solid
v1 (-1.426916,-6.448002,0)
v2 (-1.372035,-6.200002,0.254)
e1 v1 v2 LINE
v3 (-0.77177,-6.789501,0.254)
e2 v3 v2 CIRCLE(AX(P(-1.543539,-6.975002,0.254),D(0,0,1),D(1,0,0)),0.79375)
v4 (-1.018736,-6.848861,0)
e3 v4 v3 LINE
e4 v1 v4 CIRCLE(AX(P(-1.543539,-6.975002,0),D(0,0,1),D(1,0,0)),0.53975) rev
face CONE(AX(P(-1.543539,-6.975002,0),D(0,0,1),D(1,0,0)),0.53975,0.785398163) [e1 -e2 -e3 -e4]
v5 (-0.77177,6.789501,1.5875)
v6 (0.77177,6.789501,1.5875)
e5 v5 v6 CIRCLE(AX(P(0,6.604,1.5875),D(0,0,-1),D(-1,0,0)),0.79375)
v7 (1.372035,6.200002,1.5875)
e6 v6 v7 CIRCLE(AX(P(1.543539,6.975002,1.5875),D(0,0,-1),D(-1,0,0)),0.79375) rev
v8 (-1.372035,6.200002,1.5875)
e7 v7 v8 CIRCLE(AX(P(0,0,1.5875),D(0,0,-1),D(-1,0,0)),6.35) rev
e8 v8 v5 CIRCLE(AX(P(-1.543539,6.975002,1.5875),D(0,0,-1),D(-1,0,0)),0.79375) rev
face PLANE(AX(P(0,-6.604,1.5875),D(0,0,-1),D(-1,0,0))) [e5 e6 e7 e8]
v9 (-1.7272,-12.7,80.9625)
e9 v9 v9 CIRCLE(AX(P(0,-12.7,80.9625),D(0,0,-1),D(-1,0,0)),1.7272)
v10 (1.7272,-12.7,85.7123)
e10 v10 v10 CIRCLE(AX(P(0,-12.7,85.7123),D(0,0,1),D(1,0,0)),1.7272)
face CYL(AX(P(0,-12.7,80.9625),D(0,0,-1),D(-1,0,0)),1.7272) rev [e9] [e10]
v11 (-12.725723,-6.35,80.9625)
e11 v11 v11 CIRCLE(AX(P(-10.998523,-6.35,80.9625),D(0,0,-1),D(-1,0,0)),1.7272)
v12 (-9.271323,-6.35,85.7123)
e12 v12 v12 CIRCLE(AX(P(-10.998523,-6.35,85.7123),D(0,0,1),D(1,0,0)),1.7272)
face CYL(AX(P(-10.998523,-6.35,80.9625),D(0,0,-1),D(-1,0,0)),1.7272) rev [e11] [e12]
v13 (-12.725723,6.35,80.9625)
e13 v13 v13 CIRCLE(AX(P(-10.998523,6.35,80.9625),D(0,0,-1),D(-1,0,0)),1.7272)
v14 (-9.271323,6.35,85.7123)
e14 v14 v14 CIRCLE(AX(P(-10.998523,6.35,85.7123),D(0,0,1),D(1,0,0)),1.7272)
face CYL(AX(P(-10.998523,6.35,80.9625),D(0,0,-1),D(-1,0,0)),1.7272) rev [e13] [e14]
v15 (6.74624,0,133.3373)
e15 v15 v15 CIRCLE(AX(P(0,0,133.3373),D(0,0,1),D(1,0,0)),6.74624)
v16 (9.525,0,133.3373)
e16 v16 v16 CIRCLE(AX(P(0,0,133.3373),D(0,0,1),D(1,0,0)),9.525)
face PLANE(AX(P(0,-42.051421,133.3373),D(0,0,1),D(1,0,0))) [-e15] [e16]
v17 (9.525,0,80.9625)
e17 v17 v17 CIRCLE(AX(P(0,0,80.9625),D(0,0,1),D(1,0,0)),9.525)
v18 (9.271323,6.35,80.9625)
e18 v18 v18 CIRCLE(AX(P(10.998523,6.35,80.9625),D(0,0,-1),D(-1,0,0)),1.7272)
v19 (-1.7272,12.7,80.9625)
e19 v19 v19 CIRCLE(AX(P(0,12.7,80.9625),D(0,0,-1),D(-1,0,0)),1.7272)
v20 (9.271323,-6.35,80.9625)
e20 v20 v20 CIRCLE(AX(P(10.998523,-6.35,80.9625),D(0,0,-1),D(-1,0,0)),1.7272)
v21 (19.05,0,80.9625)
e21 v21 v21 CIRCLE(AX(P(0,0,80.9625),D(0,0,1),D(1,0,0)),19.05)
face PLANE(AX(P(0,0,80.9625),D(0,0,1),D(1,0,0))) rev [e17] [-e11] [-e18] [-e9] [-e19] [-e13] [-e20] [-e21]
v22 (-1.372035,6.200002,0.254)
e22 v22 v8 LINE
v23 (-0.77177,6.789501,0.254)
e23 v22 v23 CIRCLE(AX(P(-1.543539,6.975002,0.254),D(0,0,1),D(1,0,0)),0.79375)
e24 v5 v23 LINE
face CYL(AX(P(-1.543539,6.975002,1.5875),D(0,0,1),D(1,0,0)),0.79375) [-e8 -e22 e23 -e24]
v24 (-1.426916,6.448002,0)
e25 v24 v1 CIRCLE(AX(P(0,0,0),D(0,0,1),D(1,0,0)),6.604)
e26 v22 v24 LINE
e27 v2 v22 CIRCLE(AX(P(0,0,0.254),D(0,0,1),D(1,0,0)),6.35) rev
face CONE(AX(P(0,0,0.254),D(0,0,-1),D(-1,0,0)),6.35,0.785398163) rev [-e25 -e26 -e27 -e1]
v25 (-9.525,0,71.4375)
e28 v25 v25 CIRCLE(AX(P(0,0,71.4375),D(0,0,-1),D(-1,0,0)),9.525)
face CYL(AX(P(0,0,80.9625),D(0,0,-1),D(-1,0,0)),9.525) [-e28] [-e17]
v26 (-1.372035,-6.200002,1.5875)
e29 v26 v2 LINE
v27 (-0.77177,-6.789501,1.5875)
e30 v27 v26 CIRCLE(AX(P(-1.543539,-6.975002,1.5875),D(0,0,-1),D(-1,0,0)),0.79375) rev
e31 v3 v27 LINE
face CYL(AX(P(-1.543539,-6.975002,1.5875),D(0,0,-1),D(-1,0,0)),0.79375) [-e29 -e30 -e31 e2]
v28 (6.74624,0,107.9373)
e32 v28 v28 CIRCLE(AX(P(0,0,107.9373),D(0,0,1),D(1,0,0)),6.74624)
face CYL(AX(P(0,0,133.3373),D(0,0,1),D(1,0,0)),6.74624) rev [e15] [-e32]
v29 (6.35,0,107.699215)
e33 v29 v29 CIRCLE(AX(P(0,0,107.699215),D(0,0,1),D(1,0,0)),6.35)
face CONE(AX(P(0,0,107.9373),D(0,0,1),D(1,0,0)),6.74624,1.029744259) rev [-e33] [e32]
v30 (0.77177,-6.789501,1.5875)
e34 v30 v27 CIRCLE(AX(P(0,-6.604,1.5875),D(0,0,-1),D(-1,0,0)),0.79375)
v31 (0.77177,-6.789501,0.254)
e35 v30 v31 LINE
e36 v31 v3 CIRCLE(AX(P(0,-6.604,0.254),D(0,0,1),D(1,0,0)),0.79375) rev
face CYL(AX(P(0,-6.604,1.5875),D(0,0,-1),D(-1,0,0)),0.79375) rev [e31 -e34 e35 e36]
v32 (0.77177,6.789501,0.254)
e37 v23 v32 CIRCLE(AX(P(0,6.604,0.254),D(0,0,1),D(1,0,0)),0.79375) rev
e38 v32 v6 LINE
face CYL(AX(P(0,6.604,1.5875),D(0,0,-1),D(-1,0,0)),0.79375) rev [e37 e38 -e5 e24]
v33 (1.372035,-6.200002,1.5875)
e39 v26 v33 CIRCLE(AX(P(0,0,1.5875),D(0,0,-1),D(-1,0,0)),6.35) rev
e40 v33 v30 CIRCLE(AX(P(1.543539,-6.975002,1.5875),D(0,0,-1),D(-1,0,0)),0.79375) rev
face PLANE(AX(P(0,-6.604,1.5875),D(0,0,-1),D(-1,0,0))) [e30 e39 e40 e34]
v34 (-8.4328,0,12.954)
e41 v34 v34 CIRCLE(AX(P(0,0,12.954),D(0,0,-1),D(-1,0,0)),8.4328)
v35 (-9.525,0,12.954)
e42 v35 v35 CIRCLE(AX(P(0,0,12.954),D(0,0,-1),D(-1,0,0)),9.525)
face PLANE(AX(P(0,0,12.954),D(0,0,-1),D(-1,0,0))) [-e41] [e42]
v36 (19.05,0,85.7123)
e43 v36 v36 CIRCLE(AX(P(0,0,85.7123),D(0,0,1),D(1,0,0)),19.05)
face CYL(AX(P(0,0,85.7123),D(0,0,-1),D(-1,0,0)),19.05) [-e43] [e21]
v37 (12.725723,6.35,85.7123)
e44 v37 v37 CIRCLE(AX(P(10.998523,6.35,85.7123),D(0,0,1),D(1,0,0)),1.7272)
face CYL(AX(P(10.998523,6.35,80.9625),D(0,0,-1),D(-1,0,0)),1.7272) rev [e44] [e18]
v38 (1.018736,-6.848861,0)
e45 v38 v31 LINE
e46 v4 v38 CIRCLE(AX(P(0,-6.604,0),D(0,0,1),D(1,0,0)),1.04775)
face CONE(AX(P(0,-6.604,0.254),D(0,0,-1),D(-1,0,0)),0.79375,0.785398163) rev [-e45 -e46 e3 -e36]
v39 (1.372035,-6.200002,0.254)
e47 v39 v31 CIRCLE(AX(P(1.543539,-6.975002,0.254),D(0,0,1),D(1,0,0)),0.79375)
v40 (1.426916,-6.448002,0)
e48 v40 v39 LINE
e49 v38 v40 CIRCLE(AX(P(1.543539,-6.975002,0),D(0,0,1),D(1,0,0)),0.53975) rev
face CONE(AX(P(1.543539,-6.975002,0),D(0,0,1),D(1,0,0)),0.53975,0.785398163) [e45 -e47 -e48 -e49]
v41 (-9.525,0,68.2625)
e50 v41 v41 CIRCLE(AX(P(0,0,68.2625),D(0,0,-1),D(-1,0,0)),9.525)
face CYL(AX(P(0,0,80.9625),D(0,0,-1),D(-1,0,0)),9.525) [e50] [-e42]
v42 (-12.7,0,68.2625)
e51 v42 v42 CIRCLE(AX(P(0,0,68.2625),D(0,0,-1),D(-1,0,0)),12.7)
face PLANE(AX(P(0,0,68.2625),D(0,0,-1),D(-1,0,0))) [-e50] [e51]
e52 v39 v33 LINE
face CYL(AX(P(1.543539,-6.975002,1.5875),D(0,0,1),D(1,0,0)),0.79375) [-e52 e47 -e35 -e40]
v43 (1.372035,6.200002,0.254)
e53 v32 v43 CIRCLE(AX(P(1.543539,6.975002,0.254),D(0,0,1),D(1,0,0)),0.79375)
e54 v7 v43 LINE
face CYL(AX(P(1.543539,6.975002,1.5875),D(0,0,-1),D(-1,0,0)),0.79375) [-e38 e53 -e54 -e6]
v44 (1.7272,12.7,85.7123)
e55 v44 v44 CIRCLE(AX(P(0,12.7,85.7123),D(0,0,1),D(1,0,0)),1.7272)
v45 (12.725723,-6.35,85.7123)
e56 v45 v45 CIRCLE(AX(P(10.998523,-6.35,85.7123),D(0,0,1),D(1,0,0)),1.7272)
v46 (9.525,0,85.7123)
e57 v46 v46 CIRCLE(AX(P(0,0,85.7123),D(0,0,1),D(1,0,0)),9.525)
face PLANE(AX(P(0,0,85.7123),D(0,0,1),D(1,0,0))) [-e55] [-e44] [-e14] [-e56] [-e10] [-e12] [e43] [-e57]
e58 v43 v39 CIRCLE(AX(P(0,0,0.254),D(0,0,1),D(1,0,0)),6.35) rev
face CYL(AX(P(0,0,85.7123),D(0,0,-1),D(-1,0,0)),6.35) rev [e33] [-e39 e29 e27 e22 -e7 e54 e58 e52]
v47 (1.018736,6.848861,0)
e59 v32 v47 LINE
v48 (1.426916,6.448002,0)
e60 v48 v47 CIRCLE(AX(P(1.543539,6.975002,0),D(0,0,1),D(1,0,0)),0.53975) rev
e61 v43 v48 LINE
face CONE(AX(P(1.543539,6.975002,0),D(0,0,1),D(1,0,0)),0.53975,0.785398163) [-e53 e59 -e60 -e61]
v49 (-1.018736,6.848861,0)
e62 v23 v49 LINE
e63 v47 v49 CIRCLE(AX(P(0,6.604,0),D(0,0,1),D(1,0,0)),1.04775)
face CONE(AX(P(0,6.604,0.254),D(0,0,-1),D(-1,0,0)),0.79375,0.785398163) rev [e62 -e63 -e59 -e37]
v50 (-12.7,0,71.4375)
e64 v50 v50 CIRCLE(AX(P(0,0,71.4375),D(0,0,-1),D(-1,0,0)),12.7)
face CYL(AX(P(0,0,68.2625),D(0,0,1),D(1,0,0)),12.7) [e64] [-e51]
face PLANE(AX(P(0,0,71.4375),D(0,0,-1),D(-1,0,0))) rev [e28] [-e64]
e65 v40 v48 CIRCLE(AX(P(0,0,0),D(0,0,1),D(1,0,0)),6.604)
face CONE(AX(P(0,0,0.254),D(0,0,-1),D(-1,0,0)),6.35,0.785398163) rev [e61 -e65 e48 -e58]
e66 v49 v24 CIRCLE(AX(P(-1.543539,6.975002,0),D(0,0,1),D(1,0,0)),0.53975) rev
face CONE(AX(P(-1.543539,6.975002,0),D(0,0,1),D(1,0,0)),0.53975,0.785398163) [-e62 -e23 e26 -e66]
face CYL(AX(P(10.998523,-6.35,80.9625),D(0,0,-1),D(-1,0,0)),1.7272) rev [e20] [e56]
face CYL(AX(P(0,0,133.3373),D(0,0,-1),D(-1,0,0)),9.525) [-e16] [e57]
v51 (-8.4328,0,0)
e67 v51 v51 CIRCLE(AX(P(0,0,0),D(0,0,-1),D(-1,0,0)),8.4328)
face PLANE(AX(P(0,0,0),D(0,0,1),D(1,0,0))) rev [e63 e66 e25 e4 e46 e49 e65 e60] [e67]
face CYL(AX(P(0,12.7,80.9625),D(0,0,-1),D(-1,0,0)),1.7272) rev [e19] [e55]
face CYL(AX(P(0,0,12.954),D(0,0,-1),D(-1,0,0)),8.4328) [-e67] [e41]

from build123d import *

# Parameters (mm, degrees)
SKETCH1_R                      = 9.525
BOSS_EXTRUDE1_DEPTH            = 80.9625
SKETCH2_R                      = 19.05
BOSS_EXTRUDE2_DEPTH            = 4.7498
SKETCH5_OUTSIDE_W              = 60.348
SKETCH5_OUTSIDE_H              = 60.348
SKETCH5_OUTSIDE_R              = 8.4328
CUT_EXTRUDE1_DEPTH             = 12.954
SKETCH7_R                      = 12.7
BOSS_EXTRUDE3_DEPTH            = 3.175
F_8_32_TAPPED_HOLE1_AT_2_COUNT = 2
F_8_32_TAPPED_HOLE1_AT_2_PITCH = 12.7
F_8_32_TAPPED_HOLE1_AT_3_COUNT = 2
F_8_32_TAPPED_HOLE1_AT_3_PITCH = 21.997045256
F_8_32_TAPPED_HOLE1_AT_4_COUNT = 2
F_8_32_TAPPED_HOLE1_AT_4_PITCH = 25.4
F_8_32_TAPPED_HOLE1_AT_5_COUNT = 2
F_8_32_TAPPED_HOLE1_AT_5_PITCH = 21.997045256
F_8_32_TAPPED_HOLE1_AT_6_COUNT = 2
F_8_32_TAPPED_HOLE1_AT_6_PITCH = 12.7
SKETCH6_R                      = 6.35
CUT_EXTRUDE2_DEPTH             = 90.846554588
SKETCH10_R                     = 9.525
SKETCH10_R_2                   = 6.35
BOSS_EXTRUDE4_DEPTH            = 47.625
F_5_8_11_TAPPED_HOLE1_D        = 13.49248
F_5_8_11_TAPPED_HOLE1_DEPTH    = 25.4
F_5_8_11_TAPPED_HOLE1_TIP      = 4.053549943
CUT_EXTRUDE3_DEPTH             = 1.5875
FILLET1_R                      = 0.79375
CHAMFER1_SIZE                  = 0.254


with BuildPart() as part:
    # Sketch1 → Boss-Extrude1 (new body)
    with BuildSketch(Plane.XY):
        Circle(SKETCH1_R)
    extrude(amount=BOSS_EXTRUDE1_DEPTH)

    # Sketch2 → Boss-Extrude2 (add)
    with BuildSketch(Plane.XY.offset(80.9625)):
        Circle(SKETCH2_R)
    extrude(amount=BOSS_EXTRUDE2_DEPTH)

    # Sketch5 outside → Cut-Extrude1 (cut)
    with BuildSketch(Plane(origin=(0, 0, 0), x_dir=(-1, 0, 0), z_dir=(0, 0, -1))):
        Rectangle(SKETCH5_OUTSIDE_W, SKETCH5_OUTSIDE_H)
        Circle(SKETCH5_OUTSIDE_R, mode=Mode.SUBTRACT)
    extrude(amount=-CUT_EXTRUDE1_DEPTH, mode=Mode.SUBTRACT)

    # Sketch7 → Boss-Extrude3 (add)
    with BuildSketch(Plane(origin=(0, 0, 71.4375), x_dir=(-1, 0, 0), z_dir=(0, 0, -1))):
        Circle(SKETCH7_R)
    extrude(amount=BOSS_EXTRUDE3_DEPTH)

    # Sketch8 → #8-32 Tapped Hole1 (revolve, cut)
    with BuildSketch(Plane(origin=(0, 12.7, 80.9625), x_dir=(0, 1, 0), z_dir=(1, 0, 0))):
        Polygon((0, 0), (0, 11.705806461), (1.7272, 10.668), (1.7272, 0), align=None)
    f_8_32_tapped_hole1 = revolve(axis=Axis((0, 12.7, 74.6125), (0, 0, 1)), mode=Mode.SUBTRACT)

    # #8-32 Tapped Hole1 at 2: #8-32 Tapped Hole1 ×2
    with Locations(*[Vector(-0.8660254037844382, -0.500000000000001, 0) * (i * F_8_32_TAPPED_HOLE1_AT_2_PITCH) for i in range(1, F_8_32_TAPPED_HOLE1_AT_2_COUNT)]):
        add(f_8_32_tapped_hole1, mode=Mode.SUBTRACT)

    # #8-32 Tapped Hole1 at 3: #8-32 Tapped Hole1 ×2
    with Locations(*[Vector(-0.5000000000000153, -0.8660254037844298, 0) * (i * F_8_32_TAPPED_HOLE1_AT_3_PITCH) for i in range(1, F_8_32_TAPPED_HOLE1_AT_3_COUNT)]):
        add(f_8_32_tapped_hole1, mode=Mode.SUBTRACT)

    # #8-32 Tapped Hole1 at 4: #8-32 Tapped Hole1 ×2
    with Locations(*[(0, -i * F_8_32_TAPPED_HOLE1_AT_4_PITCH, 0) for i in range(1, F_8_32_TAPPED_HOLE1_AT_4_COUNT)]):
        add(f_8_32_tapped_hole1, mode=Mode.SUBTRACT)

    # #8-32 Tapped Hole1 at 5: #8-32 Tapped Hole1 ×2
    with Locations(*[Vector(0.4999999999999846, -0.8660254037844476, 0) * (i * F_8_32_TAPPED_HOLE1_AT_5_PITCH) for i in range(1, F_8_32_TAPPED_HOLE1_AT_5_COUNT)]):
        add(f_8_32_tapped_hole1, mode=Mode.SUBTRACT)

    # #8-32 Tapped Hole1 at 6: #8-32 Tapped Hole1 ×2
    with Locations(*[Vector(0.86602540378443, -0.5000000000000151, 0) * (i * F_8_32_TAPPED_HOLE1_AT_6_PITCH) for i in range(1, F_8_32_TAPPED_HOLE1_AT_6_COUNT)]):
        add(f_8_32_tapped_hole1, mode=Mode.SUBTRACT)

    # Sketch6 → Cut-Extrude2 (cut, through all)
    with BuildSketch(Plane(origin=(0, 0, 0), x_dir=(-1, 0, 0), z_dir=(0, 0, -1))):
        Circle(SKETCH6_R)
    extrude(amount=-CUT_EXTRUDE2_DEPTH, mode=Mode.SUBTRACT)

    # Sketch10 → Boss-Extrude4 (add)
    with BuildSketch(Plane.XY.offset(85.7123)):
        with Locations(Location((0, 0, 0), (0, 0, 180))):
            Circle(SKETCH10_R)
        with Locations(Location((0, 0, 0), (0, 0, 180))):
            Circle(SKETCH10_R_2, mode=Mode.SUBTRACT)
    extrude(amount=BOSS_EXTRUDE4_DEPTH)

    # 5/8-11 Tapped Hole1
    with Locations(Plane.XY.offset(133.3373)):
        with Locations((0, 0)):
            Hole(F_5_8_11_TAPPED_HOLE1_D / 2, depth=F_5_8_11_TAPPED_HOLE1_DEPTH)
            with Locations((0, 0, -(F_5_8_11_TAPPED_HOLE1_DEPTH + F_5_8_11_TAPPED_HOLE1_TIP / 2))):  # 118° drill point
                Cone(0, F_5_8_11_TAPPED_HOLE1_D / 2, F_5_8_11_TAPPED_HOLE1_TIP, mode=Mode.SUBTRACT)

    # Sketch13 → Cut-Extrude3 (cut)
    with BuildSketch(Plane(origin=(0, 0, 0), x_dir=(-1, 0, 0), z_dir=(0, 0, -1))):
        with BuildLine():
            Line((-0.79375, -6.604), (-0.79375, 6.604))
            ThreePointArc((-0.79375, 6.604), (0, 7.39775), (0.79375, 6.604))
            Line((0.79375, 6.604), (0.79375, -6.604))
            ThreePointArc((0.79375, -6.604), (0, -7.39775), (-0.79375, -6.604))
        make_face()
    extrude(amount=-CUT_EXTRUDE3_DEPTH, mode=Mode.SUBTRACT)

    # Fillet1
    # the kernel refuses this fillet: 0.79375 mm, written as the material it takes off along each edge
    with BuildSketch(Plane(origin=(0.79375, -6.300195309, 1.5875), x_dir=(0.9853201649720871, 0.17071664388506244, 0), z_dir=(0, 0, -1)), Plane(origin=(-0.79375, 6.300195309, 1.5875), x_dir=(-0.9853201649720869, -0.17071664388506383, 0), z_dir=(0, 0, -1))) as fillet1_piece_1:
        with BuildLine():
            CenterArc((0.623581926, 0.792901977), FILLET1_R, 203.344606785, 64.006660147)
            Line((-0.105190236, 0.478370264), (-0.178067452, 0.446917093))
            ThreePointArc((-0.178067452, 0.446917093), (-0.130074305, 0.285794254), (-0.078209788, -0.013550634))
            Line((-0.078209788, -0.013550634), (0.003668129, -0.079290198))
            ThreePointArc((0.003668129, -0.079290198), (0.293450318, -0.072590818), (0.583232507, -0.079290198))
            Line((0.583232507, -0.079290198), (0.586900636, 0))
        make_face()
    extrude(amount=3.054751591, mode=Mode.SUBTRACT)
    with BuildSketch(Plane(origin=(0.79375, 6.300195309, 1.5875), x_dir=(0.985320164972087, -0.17071664388506264, 0), z_dir=(0, 0, -1)), Plane(origin=(-0.79375, -6.300195309, 1.5875), x_dir=(-0.9853201649720869, 0.17071664388506363, 0), z_dir=(0, 0, -1))) as fillet1_piece_2:
        with BuildLine():
            CenterArc((0.623581926, -0.792901977), FILLET1_R, 92.648733068, 64.006660147)
            Line((-0.105190236, -0.478370264), (-0.178067452, -0.446917093))
            ThreePointArc((-0.178067452, -0.446917093), (-0.130074305, -0.285794254), (-0.078209788, 0.013550634))
            Line((-0.078209788, 0.013550634), (0.003668129, 0.079290198))
            ThreePointArc((0.003668129, 0.079290198), (0.293450318, 0.072590818), (0.583232507, 0.079290198))
            Line((0.583232507, 0.079290198), (0.586900636, 0))
        make_face()
    extrude(amount=3.054751591, mode=Mode.SUBTRACT)

    # Chamfer1
    chamfer1_edges = [part.edges().sort_by_distance(p)[0] for p in [
        (6.35, 0, 0),
        (-4.951511004, 3.975555153, 0),
        (0, -7.39775, 0),
        (0, 7.39775, 0),
        (0.987374997, 6.408680157, 0),
        (-0.987374997, 6.408680157, 0),
        (-0.987374997, -6.408680157, 0),
        (0.987374997, -6.408680157, 0),
    ]]
    chamfer(chamfer1_edges, length=CHAMFER1_SIZE)


solid = part.part
